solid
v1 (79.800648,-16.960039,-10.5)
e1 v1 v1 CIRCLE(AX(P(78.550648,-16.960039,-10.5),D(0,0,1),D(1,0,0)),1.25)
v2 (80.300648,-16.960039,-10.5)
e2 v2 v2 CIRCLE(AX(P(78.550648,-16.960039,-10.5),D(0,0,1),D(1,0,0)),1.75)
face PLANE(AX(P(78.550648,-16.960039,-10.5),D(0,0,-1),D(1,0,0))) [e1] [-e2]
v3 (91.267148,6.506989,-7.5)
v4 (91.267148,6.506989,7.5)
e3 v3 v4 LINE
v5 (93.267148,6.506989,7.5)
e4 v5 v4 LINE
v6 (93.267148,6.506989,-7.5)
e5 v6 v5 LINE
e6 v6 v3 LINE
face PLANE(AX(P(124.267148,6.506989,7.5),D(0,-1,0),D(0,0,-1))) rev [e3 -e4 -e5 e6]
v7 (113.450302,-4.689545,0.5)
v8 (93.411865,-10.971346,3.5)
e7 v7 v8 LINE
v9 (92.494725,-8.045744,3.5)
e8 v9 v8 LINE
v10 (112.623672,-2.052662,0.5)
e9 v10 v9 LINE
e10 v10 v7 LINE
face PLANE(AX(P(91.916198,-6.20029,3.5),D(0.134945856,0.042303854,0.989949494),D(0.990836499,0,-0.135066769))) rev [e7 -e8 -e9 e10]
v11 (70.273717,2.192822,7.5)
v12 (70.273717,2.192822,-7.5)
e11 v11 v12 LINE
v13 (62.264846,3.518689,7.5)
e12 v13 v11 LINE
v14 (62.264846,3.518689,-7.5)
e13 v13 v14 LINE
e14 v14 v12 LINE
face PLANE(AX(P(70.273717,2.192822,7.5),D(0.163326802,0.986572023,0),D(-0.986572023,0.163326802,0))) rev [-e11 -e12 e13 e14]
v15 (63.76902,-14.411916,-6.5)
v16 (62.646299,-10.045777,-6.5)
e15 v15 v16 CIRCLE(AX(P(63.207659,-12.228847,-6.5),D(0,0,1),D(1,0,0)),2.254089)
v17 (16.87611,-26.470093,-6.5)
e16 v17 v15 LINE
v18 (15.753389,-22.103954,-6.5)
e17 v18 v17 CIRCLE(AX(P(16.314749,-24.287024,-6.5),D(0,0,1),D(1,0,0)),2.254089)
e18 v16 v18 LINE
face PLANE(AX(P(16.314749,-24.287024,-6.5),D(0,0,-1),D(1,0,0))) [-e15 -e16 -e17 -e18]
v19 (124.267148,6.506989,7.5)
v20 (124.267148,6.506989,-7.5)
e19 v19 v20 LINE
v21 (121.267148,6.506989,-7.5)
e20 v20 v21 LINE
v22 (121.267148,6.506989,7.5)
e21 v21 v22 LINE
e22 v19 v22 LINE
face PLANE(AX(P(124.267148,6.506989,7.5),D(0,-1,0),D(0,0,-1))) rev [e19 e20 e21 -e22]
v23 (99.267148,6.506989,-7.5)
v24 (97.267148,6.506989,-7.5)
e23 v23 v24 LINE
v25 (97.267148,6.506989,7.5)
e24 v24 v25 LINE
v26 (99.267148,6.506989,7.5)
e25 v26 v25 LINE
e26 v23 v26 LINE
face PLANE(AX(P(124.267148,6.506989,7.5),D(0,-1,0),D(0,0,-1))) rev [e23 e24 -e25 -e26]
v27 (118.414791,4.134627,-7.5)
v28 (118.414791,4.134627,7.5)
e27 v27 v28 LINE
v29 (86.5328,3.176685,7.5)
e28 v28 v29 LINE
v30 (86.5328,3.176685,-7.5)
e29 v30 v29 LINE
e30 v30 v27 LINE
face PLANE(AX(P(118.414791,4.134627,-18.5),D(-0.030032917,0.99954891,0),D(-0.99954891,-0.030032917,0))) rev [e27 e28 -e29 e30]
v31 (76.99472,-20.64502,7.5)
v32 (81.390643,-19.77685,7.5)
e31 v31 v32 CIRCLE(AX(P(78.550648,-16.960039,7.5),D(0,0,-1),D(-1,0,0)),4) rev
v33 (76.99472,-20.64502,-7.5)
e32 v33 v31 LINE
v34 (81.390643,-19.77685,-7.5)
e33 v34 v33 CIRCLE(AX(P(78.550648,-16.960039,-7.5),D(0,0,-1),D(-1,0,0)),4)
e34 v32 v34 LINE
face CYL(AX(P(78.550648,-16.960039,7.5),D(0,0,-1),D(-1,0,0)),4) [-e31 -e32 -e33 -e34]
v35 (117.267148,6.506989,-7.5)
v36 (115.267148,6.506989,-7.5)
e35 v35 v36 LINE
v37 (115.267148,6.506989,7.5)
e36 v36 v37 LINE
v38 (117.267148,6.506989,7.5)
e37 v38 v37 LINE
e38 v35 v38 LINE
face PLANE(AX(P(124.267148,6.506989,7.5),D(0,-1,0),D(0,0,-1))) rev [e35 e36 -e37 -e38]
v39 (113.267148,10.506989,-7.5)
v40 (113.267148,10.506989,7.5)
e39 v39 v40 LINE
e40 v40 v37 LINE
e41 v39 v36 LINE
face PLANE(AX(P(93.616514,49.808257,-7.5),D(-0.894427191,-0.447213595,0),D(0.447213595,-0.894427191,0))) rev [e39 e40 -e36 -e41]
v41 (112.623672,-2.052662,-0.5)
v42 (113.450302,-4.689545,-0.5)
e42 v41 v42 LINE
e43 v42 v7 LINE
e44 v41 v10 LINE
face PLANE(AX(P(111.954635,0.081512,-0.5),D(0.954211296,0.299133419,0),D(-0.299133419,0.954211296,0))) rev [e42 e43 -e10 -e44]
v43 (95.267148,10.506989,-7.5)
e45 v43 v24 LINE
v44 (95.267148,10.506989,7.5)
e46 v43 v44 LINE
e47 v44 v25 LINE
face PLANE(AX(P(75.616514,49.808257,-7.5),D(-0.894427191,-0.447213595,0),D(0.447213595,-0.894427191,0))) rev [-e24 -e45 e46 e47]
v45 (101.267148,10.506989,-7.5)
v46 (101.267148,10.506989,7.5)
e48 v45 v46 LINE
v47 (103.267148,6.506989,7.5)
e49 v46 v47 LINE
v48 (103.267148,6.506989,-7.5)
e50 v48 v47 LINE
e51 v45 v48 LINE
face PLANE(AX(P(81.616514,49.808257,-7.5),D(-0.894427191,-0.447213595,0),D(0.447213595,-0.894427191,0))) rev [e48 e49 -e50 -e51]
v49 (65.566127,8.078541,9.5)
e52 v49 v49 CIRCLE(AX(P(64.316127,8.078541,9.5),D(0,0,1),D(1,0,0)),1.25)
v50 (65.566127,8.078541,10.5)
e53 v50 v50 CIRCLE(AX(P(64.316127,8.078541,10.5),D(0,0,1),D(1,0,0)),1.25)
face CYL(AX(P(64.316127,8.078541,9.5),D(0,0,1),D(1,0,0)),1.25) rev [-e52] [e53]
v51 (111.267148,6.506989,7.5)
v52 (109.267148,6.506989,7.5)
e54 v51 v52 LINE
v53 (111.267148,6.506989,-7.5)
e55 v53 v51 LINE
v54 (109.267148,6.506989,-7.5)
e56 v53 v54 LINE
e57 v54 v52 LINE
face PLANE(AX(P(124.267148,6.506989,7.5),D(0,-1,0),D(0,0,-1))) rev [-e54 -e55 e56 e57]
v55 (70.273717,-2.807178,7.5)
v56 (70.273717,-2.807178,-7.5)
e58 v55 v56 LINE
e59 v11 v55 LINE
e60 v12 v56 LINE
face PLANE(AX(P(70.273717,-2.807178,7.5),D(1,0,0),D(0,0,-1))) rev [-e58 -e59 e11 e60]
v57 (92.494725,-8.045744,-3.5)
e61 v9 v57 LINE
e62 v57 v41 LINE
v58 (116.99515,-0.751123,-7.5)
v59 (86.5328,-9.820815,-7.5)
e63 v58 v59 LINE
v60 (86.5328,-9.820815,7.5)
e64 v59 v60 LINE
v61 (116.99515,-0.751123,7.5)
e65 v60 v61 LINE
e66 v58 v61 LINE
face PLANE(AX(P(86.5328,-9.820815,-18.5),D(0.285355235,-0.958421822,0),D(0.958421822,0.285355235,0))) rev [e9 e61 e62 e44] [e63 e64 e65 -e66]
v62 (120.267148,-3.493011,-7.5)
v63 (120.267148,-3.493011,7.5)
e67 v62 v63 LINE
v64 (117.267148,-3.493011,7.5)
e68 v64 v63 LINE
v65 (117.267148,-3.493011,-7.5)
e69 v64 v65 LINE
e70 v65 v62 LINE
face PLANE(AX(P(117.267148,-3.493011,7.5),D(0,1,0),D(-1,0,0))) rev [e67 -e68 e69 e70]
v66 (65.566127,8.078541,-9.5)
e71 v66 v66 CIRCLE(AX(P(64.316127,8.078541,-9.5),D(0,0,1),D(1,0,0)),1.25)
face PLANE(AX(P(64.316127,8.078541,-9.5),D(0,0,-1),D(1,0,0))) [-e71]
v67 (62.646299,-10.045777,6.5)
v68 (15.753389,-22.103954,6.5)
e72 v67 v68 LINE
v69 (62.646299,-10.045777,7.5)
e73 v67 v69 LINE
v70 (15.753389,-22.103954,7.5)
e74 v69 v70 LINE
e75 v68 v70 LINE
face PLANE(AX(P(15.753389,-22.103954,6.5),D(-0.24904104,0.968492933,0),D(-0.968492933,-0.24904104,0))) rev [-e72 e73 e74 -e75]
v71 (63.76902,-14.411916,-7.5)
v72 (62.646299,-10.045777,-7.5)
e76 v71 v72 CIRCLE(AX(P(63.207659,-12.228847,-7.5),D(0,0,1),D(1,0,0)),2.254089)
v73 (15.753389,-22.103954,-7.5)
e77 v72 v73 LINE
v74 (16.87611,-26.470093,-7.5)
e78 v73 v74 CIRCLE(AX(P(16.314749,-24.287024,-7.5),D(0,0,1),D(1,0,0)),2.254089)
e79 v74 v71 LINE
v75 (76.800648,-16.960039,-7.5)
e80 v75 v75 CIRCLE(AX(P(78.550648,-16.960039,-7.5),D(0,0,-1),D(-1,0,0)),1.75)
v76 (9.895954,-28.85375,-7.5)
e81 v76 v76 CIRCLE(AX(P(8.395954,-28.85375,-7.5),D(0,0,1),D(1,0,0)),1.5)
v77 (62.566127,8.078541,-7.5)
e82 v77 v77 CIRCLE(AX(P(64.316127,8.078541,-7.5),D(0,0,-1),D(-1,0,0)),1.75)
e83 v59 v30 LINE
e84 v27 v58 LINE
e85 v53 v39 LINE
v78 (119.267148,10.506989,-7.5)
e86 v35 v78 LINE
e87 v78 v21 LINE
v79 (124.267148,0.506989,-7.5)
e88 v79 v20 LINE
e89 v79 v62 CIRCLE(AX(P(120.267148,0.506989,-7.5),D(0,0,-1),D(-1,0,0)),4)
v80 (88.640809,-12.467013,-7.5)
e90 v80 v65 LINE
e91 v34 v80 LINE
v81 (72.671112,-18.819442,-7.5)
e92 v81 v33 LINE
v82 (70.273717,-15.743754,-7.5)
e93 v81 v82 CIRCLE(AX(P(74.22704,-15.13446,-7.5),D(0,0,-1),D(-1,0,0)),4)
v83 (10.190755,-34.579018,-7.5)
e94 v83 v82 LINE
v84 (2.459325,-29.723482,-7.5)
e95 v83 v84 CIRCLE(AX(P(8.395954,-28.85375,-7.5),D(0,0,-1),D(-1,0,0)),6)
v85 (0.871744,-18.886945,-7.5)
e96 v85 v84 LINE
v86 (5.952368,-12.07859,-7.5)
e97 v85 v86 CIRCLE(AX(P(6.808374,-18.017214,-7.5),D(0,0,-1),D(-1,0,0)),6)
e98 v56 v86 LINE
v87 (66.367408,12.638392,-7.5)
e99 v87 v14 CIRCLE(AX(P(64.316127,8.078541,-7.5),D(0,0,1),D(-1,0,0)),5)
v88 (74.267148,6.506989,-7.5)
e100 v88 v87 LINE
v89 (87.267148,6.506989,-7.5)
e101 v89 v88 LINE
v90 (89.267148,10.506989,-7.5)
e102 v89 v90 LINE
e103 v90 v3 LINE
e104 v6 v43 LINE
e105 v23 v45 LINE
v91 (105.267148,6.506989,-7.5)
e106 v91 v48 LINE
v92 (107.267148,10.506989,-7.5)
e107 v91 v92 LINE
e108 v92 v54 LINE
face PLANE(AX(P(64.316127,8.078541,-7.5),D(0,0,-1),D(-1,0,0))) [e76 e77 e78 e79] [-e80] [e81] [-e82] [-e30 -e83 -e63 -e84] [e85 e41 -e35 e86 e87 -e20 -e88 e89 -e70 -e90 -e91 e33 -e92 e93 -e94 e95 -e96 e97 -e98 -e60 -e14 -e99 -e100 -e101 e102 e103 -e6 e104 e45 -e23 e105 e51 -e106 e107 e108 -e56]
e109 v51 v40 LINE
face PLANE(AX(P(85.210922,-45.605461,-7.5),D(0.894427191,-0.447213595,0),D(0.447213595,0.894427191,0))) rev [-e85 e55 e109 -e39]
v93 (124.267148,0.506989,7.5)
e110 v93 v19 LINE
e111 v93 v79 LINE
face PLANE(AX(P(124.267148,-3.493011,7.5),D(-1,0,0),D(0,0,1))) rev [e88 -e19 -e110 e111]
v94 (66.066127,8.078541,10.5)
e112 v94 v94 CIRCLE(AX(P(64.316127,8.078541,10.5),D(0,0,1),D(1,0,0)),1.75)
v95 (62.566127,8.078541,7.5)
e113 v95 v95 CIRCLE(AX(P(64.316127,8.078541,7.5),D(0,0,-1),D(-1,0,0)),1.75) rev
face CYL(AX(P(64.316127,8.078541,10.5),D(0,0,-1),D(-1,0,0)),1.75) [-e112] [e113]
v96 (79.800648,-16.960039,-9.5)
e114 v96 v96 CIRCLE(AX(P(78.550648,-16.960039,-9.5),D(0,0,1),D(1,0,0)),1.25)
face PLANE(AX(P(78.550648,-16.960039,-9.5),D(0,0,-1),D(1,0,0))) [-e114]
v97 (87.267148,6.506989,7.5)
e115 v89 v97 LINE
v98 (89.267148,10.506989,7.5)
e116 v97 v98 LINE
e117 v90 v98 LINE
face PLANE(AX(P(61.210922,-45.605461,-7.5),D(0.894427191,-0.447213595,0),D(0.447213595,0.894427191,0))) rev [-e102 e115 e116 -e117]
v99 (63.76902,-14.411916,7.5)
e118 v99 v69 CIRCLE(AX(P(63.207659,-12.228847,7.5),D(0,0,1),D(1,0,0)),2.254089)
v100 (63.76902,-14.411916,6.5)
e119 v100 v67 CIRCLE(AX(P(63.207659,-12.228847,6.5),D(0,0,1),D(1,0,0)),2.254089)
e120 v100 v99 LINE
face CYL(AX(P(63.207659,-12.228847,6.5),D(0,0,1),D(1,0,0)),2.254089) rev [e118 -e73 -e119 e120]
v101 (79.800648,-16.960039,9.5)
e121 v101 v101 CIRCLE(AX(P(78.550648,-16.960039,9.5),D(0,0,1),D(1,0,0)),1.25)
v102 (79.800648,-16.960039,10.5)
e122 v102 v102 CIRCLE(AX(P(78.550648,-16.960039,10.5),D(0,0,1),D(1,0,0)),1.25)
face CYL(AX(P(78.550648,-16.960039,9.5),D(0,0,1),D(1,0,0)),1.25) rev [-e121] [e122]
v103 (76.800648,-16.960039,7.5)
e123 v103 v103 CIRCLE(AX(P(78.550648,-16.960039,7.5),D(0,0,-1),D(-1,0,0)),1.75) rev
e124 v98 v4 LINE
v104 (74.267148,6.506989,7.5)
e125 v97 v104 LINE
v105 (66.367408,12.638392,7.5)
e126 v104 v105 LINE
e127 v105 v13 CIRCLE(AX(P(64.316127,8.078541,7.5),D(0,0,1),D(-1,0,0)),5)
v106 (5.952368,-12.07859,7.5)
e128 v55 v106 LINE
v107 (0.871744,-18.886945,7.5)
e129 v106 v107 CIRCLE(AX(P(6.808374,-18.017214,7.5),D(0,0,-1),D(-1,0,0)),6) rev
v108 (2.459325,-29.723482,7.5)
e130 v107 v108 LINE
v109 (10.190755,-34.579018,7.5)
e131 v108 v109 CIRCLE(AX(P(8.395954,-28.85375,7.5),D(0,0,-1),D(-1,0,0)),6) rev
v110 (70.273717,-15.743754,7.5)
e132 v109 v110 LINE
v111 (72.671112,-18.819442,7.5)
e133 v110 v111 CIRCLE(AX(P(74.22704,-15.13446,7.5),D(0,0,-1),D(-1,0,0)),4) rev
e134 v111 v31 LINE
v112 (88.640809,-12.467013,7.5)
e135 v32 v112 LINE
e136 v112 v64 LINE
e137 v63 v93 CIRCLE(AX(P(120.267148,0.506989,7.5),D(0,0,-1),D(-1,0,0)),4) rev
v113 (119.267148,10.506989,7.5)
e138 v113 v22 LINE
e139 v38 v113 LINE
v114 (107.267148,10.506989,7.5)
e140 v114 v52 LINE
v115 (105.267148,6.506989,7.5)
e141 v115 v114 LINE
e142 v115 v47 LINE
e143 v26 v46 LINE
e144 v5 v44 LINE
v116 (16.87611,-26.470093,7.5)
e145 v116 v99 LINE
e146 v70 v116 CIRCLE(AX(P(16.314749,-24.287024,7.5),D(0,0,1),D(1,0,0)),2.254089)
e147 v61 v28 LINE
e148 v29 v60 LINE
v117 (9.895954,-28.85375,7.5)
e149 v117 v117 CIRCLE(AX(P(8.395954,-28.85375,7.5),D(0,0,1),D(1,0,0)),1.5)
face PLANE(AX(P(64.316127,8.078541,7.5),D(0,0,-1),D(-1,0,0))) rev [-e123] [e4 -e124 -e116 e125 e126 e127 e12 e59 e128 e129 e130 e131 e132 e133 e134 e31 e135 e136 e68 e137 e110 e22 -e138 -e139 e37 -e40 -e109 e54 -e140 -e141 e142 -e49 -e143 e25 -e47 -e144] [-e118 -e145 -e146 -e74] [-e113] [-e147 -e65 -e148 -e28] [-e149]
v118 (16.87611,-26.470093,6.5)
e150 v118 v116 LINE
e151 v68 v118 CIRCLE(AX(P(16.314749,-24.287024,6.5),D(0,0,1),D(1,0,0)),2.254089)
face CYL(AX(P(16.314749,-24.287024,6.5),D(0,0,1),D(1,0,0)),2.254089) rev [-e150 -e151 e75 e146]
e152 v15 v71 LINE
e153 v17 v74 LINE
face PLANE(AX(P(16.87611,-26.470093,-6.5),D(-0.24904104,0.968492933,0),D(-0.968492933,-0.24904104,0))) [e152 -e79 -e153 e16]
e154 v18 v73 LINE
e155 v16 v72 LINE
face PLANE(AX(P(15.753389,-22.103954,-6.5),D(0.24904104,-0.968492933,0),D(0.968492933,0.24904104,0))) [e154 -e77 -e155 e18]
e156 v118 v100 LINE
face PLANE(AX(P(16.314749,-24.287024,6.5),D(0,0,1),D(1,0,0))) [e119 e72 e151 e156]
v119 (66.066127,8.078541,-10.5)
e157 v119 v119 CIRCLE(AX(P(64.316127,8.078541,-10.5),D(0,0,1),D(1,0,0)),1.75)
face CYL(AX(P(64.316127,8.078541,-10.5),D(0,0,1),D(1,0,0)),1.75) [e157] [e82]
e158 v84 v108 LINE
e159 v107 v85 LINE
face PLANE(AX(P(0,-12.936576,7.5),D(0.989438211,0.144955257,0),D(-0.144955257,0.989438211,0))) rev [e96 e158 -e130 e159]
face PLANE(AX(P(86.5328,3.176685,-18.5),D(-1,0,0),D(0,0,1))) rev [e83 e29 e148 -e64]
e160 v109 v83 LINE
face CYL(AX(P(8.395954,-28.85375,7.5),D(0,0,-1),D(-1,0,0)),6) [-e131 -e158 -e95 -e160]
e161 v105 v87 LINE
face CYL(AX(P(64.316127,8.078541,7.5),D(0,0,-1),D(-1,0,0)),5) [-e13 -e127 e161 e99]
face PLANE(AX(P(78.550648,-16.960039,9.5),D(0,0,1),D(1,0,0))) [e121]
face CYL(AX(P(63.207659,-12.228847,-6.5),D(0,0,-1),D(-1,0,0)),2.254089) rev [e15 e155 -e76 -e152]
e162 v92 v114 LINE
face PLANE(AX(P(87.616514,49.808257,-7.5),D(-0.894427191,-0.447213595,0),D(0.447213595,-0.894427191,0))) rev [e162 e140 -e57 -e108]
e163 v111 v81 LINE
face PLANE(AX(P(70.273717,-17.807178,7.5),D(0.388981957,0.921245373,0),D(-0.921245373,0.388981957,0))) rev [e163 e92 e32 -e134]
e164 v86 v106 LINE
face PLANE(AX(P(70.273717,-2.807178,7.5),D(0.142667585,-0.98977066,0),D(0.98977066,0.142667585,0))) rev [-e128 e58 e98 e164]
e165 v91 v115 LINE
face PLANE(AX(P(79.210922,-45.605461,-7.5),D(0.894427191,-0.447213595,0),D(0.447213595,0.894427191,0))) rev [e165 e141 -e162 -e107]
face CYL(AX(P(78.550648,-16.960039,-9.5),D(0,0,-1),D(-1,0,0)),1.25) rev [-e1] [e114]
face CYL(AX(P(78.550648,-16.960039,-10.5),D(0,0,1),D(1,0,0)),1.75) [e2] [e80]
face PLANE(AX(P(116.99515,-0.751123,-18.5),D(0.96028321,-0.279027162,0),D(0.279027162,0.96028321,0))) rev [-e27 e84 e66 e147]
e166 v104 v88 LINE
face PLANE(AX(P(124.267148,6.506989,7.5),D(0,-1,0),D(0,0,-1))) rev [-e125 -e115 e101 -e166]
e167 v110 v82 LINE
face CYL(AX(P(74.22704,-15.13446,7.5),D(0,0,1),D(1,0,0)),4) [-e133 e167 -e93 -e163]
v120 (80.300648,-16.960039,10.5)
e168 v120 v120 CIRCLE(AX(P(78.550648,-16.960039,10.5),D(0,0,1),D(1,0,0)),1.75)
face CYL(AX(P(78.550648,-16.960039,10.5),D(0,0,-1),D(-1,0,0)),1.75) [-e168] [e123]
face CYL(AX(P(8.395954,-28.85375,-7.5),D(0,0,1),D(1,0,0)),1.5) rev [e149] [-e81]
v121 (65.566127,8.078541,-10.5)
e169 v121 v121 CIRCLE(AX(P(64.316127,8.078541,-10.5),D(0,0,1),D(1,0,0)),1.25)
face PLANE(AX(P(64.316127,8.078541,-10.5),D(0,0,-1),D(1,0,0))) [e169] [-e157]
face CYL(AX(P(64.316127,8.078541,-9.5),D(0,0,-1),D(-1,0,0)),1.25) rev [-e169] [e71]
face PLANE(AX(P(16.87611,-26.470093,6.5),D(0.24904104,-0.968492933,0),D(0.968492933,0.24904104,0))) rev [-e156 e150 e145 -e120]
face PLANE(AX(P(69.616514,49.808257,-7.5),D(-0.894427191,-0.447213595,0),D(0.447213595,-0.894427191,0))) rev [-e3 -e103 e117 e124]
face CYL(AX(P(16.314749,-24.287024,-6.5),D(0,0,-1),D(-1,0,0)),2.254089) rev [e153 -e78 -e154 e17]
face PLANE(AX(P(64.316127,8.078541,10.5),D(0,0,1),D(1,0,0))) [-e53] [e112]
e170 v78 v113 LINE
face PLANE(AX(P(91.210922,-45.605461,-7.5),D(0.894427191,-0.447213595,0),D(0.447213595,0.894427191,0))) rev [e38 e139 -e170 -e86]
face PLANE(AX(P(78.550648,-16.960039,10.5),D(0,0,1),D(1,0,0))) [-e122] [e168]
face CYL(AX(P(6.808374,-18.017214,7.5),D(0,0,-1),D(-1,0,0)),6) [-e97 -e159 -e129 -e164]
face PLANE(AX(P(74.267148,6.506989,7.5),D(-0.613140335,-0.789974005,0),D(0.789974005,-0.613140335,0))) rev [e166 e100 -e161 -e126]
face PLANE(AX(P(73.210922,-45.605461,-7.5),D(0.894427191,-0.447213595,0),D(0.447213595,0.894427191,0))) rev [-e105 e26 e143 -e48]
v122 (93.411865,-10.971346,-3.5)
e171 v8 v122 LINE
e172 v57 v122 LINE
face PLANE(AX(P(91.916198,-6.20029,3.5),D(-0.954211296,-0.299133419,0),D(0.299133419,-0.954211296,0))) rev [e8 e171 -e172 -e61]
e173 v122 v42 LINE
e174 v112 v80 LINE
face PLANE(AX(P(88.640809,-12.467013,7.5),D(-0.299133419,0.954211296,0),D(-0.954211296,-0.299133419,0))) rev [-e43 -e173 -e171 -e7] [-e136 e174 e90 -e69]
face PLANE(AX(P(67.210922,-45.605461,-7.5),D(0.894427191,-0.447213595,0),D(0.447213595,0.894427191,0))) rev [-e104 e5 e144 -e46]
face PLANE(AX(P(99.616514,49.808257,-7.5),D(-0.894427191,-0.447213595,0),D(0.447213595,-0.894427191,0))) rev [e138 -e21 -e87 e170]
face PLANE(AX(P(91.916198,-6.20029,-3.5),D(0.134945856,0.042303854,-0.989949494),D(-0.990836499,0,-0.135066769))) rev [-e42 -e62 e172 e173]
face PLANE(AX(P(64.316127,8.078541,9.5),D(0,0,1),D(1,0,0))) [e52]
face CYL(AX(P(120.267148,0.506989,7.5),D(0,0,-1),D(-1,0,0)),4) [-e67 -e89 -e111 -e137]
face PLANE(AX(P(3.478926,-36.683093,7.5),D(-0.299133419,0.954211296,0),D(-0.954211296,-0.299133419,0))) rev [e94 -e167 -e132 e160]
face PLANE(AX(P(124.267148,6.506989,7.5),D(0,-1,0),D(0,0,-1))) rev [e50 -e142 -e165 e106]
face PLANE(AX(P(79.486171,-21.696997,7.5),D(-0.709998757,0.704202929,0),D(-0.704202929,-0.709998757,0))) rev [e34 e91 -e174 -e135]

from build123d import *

# Parameters (mm, degrees)
BOSS_EXTRUDE1_DEPTH = 7.5
FILLET1_R           = 6
FILLET2_R           = 4
BOSS_EXTRUDE2_DEPTH = 15
LPATTERN1_COUNT     = 6
LPATTERN1_PITCH     = 6
CUT_EXTRUDE1_DEPTH  = 26
CUT_EXTRUDE2_DEPTH  = 5
SKETCH5_R           = 1.5
CUT_EXTRUDE3_DEPTH  = 130.931165931
SKETCH6_R           = 1.75
BOSS_EXTRUDE3_DEPTH = 3
SKETCH7_R           = 1.25
CUT_EXTRUDE4_DEPTH  = 1
SKETCH8_R           = 1.25
CUT_EXTRUDE5_DEPTH  = 1
CUT_EXTRUDE6_DEPTH  = 1


with BuildPart() as part:
    # Sketch1 → Boss-Extrude1 (new, symmetric)
    with BuildSketch(Plane(origin=(0, 0, 0), x_dir=(0, 1, 0), z_dir=(0, 0, 1))):
        with BuildLine():
            Line((-12.93657624, 0), (-36.683093305, -3.478926169))
            Line((-36.683093305, -3.478926169), (-15.74375395, -70.273716889))
            Line((-15.74375395, -70.273716889), (-17.80717771, -70.273716889))
            Line((-17.80717771, -70.273716889), (-21.696997284, -79.486170616))
            Line((-21.696997284, -79.486170616), (-12.467013439, -88.640808687))
            Line((-12.467013439, -88.640808687), (-3.493010858, -117.267147567))
            Line((-3.493010858, -117.267147567), (-3.493010858, -124.267147567))
            Line((-3.493010858, -124.267147567), (6.506989142, -124.267147567))
            Line((6.506989142, -124.267147567), (6.506989142, -74.267147567))
            Line((6.506989142, -74.267147567), (12.638392495, -66.367407513))
            ThreePointArc((12.638392495, -66.367407513), (10.129821893, -59.756274968), (3.518689347, -62.26484557))
            Line((3.518689347, -62.26484557), (2.19282229, -70.273716889))
            Line((2.19282229, -70.273716889), (-2.80717771, -70.273716889))
            Line((-2.80717771, -70.273716889), (-12.93657624, 0))
        make_face()
    extrude(amount=BOSS_EXTRUDE1_DEPTH, both=True)

    # Fillet1
    fillet1_edges = [part.edges().sort_by_distance(p)[0] for p in [
        (3.478926169, -36.683093305, 0),
        (0, -12.93657624, 0),
    ]]
    fillet(fillet1_edges, radius=FILLET1_R)

    # Fillet2
    # the kernel refuses this fillet: 4 mm, written as the material it takes off along each edge
    with BuildSketch(Plane(origin=(124.267147567, -3.493010858, -17.5), x_dir=(0, 1, 0), z_dir=(0, 0, 1))) as fillet2_piece_1:
        with BuildLine():
            CenterArc((FILLET2_R, FILLET2_R), FILLET2_R, 180, 90)
            Line((0, FILLET2_R), (-FILLET2_R * 0.02, FILLET2_R))
            Line((-FILLET2_R * 0.02, FILLET2_R), (-FILLET2_R * 0.02, -FILLET2_R * 0.02))
            Line((-FILLET2_R * 0.02, -FILLET2_R * 0.02), (FILLET2_R, -FILLET2_R * 0.02))
            Line((FILLET2_R, -FILLET2_R * 0.02), (FILLET2_R, 0))
        make_face()
    extrude(amount=35, mode=Mode.SUBTRACT)
    with BuildSketch(Plane(origin=(70.273716889, -17.80717771, -14.005853421), x_dir=(0, 1, 0), z_dir=(0, 0, 1))) as fillet2_piece_2_section:
        with BuildLine():
            CenterArc((2.672717651, -3.953322774), FILLET2_R, 98.761599305, 58.347232051)
            Line((-1.012263839, -2.397394944), (-1.085963469, -2.366276387))
            Line((-1.085963469, -2.366276387), (-0.07369963, 0.031118557))
            Line((-0.07369963, 0.031118557), (0, 0.08))
            ThreePointArc((0, 0.08), (1.03171188, 0.08), (2.051237882, 0.079066455))
            Line((2.051237882, 0.079066455), (2.06342376, 0))
        make_face()
    fillet2_piece_2 = extrude(amount=28.011706842, mode=Mode.PRIVATE)
    fillet2_piece_2 = split(fillet2_piece_2, bisect_by=Plane(origin=(70.257081216, -15.748969027, 0), z_dir=(0.2991334193615799, -0.954211296003694, 0)), keep=Keep.TOP, mode=Mode.PRIVATE)
    add(fillet2_piece_2, mode=Mode.SUBTRACT)
    with BuildSketch(Plane(origin=(79.486170616, -21.696997284, -14.26109301), x_dir=(-0.9212453727262618, 0.3889819574613337, 0), z_dir=(0, 0, 1))) as fillet2_piece_3:
        with BuildLine():
            CenterArc((FILLET2_R * 0.676109301023, -FILLET2_R), FILLET2_R, 90, 68.125982867)
            Line((-FILLET2_R * 0.251896002422, -FILLET2_R * 0.627433017057), (-FILLET2_R * 0.270456108491, -FILLET2_R * 0.619981677398))
            Line((-FILLET2_R * 0.270456108491, -FILLET2_R * 0.619981677398), (-FILLET2_R * 0.0135221860205, FILLET2_R * 0.02))
            Line((-FILLET2_R * 0.0135221860205, FILLET2_R * 0.02), (FILLET2_R * 0.676109301023, FILLET2_R * 0.02))
            Line((FILLET2_R * 0.676109301023, FILLET2_R * 0.02), (FILLET2_R * 0.676109301023, 0))
        make_face()
    extrude(amount=28.52218602, mode=Mode.SUBTRACT)

    # Sketch2 → Boss-Extrude2 (add)
    with BuildSketch(Plane.XY.offset(7.5)):
        Polygon((119.267147567, 6.506989142), (121.267147567, 6.506989142), (119.267147567, 10.506989142), align=None)
        Polygon((117.267147567, 6.506989142), (119.267147567, 6.506989142), (119.267147567, 10.506989142), align=None)
    boss_extrude2 = extrude(amount=-BOSS_EXTRUDE2_DEPTH)

    # LPattern1: Boss-Extrude2 ×6
    with Locations(*[(-i * LPATTERN1_PITCH, 0, 0) for i in range(1, LPATTERN1_COUNT)]):
        add(boss_extrude2)

    # Sketch3 → Cut-Extrude1 (cut)
    with BuildSketch(Plane.XY.offset(7.5)):
        Polygon((118.41479062, 4.13462657), (86.532799982, 3.176685284), (86.532799982, -9.820815038), (116.995150337, -0.75112261), align=None)
    extrude(amount=-CUT_EXTRUDE1_DEPTH, mode=Mode.SUBTRACT)

    # Sketch4 → Cut-Extrude2 (cut)
    with BuildSketch(Plane(origin=(11.490191231, -36.652776175, 0), x_dir=(0.954211296003694, 0.2991334193615799, 0), z_dir=(0.29913341936157983, -0.9542112960036939, 0))):
        Polygon((85.852760577, 3.5), (85.852760577, -3.5), (106.852760577, -0.5), (106.852760577, 0.5), align=None)
    extrude(amount=-CUT_EXTRUDE2_DEPTH, mode=Mode.SUBTRACT)

    # Sketch5 → Cut-Extrude3 (cut, through all)
    with BuildSketch(Plane.XY.offset(7.5)):
        with Locations((8.395954367, -28.853750382)):
            Circle(SKETCH5_R)
    extrude(amount=-CUT_EXTRUDE3_DEPTH, mode=Mode.SUBTRACT)

    # Sketch6 → Boss-Extrude3 (add)
    with BuildSketch(Plane.XY.offset(7.5)):
        with Locations(Location((78.550648186, -16.960038516, 0), (0, 0, 180))):
            Circle(SKETCH6_R)
        with Locations(Location((64.316126541, 8.078540921, 0), (0, 0, 180))):
            Circle(SKETCH6_R)
    boss_extrude3 = extrude(amount=BOSS_EXTRUDE3_DEPTH)

    # Sketch7 → Cut-Extrude4 (cut)
    with BuildSketch(Plane.XY.offset(10.5)):
        with Locations((78.550648186, -16.960038516)):
            Circle(SKETCH7_R)
    cut_extrude4 = extrude(amount=-CUT_EXTRUDE4_DEPTH, mode=Mode.SUBTRACT)

    # Sketch8 → Cut-Extrude5 (cut)
    with BuildSketch(Plane.XY.offset(10.5)):
        with Locations((64.316126541, 8.078540921)):
            Circle(SKETCH8_R)
    cut_extrude5 = extrude(amount=-CUT_EXTRUDE5_DEPTH, mode=Mode.SUBTRACT)

    # Sketch9 → Cut-Extrude6 (cut)
    with BuildSketch(Plane.XY.offset(7.5)):
        with BuildLine():
            Line((15.753388713, -22.103953925), (62.646298586, -10.0457771))
            ThreePointArc((62.646298586, -10.0457771), (65.390728962, -11.667485959), (63.769020103, -14.411916335))
            Line((63.769020103, -14.411916335), (16.87611023, -26.470093159))
            ThreePointArc((16.87611023, -26.470093159), (14.131679854, -24.848384301), (15.753388713, -22.103953925))
        make_face()
    cut_extrude6 = extrude(amount=-CUT_EXTRUDE6_DEPTH, mode=Mode.SUBTRACT)

    # Mirror1: Boss-Extrude3, Cut-Extrude4, Cut-Extrude5, Cut-Extrude6 across plane
    add(boss_extrude3.mirror(Plane.XY))
    add(cut_extrude4.mirror(Plane.XY), mode=Mode.SUBTRACT)
    add(cut_extrude5.mirror(Plane.XY), mode=Mode.SUBTRACT)
    add(cut_extrude6.mirror(Plane.XY), mode=Mode.SUBTRACT)


solid = part.part
